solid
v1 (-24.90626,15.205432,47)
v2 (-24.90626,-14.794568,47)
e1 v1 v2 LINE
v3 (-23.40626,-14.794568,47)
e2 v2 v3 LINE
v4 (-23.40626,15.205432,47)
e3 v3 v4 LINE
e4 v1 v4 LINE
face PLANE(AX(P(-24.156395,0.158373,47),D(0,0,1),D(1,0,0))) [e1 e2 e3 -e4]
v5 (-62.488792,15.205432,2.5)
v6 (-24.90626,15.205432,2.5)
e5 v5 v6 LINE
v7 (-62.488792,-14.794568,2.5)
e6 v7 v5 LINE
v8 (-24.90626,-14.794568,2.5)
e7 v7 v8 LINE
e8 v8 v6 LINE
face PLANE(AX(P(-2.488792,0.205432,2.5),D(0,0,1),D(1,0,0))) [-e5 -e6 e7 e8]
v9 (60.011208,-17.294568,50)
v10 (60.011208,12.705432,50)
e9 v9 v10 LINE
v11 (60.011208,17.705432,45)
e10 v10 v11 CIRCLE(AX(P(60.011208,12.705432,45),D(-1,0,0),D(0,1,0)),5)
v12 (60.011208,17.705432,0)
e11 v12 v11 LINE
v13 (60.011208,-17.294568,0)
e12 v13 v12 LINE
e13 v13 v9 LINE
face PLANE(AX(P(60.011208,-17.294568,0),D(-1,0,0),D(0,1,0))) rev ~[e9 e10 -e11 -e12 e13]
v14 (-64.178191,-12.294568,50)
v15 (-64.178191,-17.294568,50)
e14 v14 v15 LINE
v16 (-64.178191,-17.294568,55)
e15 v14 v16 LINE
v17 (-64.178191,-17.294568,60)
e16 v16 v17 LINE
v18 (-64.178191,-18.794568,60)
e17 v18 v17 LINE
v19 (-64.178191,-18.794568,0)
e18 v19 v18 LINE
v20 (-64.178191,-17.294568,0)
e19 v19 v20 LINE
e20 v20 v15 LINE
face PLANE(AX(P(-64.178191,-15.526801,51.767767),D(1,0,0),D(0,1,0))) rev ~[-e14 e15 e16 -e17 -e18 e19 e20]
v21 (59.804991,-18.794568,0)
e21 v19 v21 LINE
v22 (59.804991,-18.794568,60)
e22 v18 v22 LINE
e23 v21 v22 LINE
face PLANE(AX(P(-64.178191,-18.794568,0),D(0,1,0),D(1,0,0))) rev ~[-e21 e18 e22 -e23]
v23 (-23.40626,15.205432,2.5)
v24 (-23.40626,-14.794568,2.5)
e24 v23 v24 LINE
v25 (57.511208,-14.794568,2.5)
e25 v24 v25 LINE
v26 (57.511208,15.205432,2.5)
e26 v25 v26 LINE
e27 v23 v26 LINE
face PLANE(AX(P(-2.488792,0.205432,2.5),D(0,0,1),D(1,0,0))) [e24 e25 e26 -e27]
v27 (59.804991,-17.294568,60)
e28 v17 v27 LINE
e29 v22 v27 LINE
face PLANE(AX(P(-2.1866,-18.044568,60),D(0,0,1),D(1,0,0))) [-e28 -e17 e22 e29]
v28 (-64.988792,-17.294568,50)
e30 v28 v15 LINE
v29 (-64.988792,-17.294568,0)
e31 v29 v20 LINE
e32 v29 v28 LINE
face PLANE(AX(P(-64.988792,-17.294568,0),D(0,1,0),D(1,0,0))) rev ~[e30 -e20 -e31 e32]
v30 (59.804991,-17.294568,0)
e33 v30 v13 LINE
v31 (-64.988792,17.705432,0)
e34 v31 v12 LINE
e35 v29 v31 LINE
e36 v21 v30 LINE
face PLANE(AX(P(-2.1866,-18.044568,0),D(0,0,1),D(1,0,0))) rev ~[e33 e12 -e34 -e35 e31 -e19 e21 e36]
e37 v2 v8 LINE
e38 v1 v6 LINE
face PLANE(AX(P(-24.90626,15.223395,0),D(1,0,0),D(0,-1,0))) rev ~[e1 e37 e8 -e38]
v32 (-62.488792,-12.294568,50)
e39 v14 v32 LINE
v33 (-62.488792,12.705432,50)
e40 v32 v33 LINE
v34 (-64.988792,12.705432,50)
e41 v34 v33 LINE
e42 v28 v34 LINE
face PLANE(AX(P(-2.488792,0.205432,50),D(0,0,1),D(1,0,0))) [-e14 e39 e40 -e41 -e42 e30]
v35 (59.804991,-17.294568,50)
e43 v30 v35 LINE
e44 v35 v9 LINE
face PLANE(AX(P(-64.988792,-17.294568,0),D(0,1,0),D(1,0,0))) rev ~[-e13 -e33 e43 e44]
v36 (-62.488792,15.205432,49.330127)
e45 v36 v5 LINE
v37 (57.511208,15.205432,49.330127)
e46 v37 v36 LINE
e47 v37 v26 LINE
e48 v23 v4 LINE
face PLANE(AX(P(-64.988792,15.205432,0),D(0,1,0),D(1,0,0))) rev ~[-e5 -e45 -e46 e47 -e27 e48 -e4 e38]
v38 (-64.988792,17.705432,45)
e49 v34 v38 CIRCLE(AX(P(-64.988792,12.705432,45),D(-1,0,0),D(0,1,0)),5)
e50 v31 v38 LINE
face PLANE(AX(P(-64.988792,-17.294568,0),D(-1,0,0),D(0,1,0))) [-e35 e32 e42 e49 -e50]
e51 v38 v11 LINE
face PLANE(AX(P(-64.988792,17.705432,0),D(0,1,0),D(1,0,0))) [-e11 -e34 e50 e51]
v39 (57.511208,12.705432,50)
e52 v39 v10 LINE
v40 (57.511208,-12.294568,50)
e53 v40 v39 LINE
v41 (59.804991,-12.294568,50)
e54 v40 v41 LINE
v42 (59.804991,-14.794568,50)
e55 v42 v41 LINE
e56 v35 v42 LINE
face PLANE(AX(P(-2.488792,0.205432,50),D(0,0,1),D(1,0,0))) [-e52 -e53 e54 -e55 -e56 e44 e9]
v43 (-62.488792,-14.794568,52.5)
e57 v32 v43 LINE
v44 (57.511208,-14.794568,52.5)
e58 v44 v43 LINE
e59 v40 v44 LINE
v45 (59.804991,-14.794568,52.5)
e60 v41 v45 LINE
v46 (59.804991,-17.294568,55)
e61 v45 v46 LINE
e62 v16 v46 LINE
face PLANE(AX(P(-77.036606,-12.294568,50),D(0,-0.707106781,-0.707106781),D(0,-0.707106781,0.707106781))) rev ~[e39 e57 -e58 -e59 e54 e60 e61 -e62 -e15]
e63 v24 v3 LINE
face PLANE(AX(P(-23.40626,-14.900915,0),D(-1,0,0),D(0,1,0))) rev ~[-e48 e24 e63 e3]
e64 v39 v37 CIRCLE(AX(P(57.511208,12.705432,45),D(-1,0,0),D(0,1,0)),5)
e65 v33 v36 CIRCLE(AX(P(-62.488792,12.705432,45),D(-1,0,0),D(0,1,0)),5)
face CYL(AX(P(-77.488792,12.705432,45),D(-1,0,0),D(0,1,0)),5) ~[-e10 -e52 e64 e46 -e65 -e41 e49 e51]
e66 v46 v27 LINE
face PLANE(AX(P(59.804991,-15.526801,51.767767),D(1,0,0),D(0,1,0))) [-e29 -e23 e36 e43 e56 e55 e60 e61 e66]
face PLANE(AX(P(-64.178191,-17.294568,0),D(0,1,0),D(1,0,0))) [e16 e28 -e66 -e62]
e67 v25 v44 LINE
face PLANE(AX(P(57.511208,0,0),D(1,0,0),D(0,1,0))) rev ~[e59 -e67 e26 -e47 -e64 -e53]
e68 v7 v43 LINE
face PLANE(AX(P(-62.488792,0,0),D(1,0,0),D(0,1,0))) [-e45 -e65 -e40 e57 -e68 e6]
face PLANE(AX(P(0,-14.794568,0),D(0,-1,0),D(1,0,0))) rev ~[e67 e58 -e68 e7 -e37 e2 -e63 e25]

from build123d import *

# Parameters (mm, degrees)
F0_W         = 125
F0_H         = 35
F1_DEPTH     = 50
F2_T         = -2.5
F3_T1_DEPTH  = 150
F5_DEPTH     = 47
F6_W         = 123.983182013
F6_H         = 1.5
F7_DEPTH     = 60
F8_T4_DEPTH  = 136.8415969529
F8_T9_DEPTH  = 123.983182013
F8_T14_DEPTH = 136.8415969529


# Not quite as in the source:
# - a fillet or chamfer that OpenCascade refuses, or shapes differently, is made with other operations: its cross-section is extruded or revolved along the edge and cut away or added


with BuildPart() as f1:
    # F0 (on Top) → F1 (new body)
    with BuildSketch(Plane.XY):
        with Locations((-2.4887919426, 0.2054322337)):
            Rectangle(F0_W, F0_H)
    extrude(amount=F1_DEPTH)

    # F2
    f2_openings = [f1.faces().sort_by_distance(p)[0] for p in [
        (-2.488792, 0.205432, 50),
    ]]
    offset(amount=F2_T, openings=f2_openings)

    # F3: fillet of radius 5 on 1 edges, made by hand

    # F3_s2 → F3_t1 (cut)
    with BuildSketch(Plane.YZ.offset(-77.4887919426)):
        with BuildLine():
            ThreePointArc((17.7054322337, 45), (16.2409661396, 48.5355339059), (12.7054322337, 50))
            Line((12.7054322337, 50), (17.7054322337, 50))
            Line((17.7054322337, 50), (17.7054322337, 45))
        make_face()
    extrude(amount=F3_T1_DEPTH, mode=Mode.SUBTRACT)

    # F4 (on Top) → F5 (join)
    with BuildSketch(Plane.XY):
        Polygon((-23.4062603042, 15.2347357944), (-24.9062603042, 15.2233950794), (-24.9062603042, -14.9235967547), (-23.4062603042, -14.9009153247), align=None)
    extrude(amount=F5_DEPTH)

    # F6 (on Top) → F7 (join)
    with BuildSketch(Plane.XY):
        with Locations((-2.1866001189, -18.0445677663)):
            Rectangle(F6_W, F6_H)
    extrude(amount=F7_DEPTH)

    # F8: chamfer of 5 on 1 edges, made by hand


with BuildPart() as f8_tool2:
    # F8_s3 → F8_t4 (new body)
    with BuildSketch(Plane.YZ.offset(-64.1781911254)):
        Polygon((-12.2945677663, 50), (-17.2945677663, 55), (-17.2945677663, 50), align=None)
    extrude(amount=F8_T4_DEPTH)

    split(bisect_by=Plane.YZ.offset(-62.4887919426), keep=Keep.BOTTOM)


with BuildPart() as f1_1:
    add(f1.part)

    # F8_t1: union F8_tool2
    add(f8_tool2.part)


with BuildPart() as f8_tool7:
    # F8_s8 → F8_t9 (new body)
    with BuildSketch(Plane.YZ.offset(-64.1781911254)):
        Polygon((-12.2945677663, 50), (-17.2945677663, 55), (-17.2945677663, 50), align=None)
    extrude(amount=F8_T9_DEPTH)

    split(bisect_by=Plane.XZ.offset(14.7945677663), keep=Keep.TOP)


with BuildPart() as f1_2:
    add(f1_1.part)

    # F8_t6: union F8_tool7
    add(f8_tool7.part)


with BuildPart() as f8_tool12:
    # F8_s13 → F8_t14 (new body)
    with BuildSketch(Plane.YZ.offset(-77.0366060652)):
        Polygon((-12.2945677663, 50), (-17.2945677663, 55), (-17.2945677663, 50), align=None)
    extrude(amount=F8_T14_DEPTH)

    split(bisect_by=Plane.YZ.offset(57.5112080574), keep=Keep.TOP)


with BuildPart() as f1_3:
    add(f1_2.part)

    # F8_t11: union F8_tool12
    add(f8_tool12.part)


solid = f1_3.part
